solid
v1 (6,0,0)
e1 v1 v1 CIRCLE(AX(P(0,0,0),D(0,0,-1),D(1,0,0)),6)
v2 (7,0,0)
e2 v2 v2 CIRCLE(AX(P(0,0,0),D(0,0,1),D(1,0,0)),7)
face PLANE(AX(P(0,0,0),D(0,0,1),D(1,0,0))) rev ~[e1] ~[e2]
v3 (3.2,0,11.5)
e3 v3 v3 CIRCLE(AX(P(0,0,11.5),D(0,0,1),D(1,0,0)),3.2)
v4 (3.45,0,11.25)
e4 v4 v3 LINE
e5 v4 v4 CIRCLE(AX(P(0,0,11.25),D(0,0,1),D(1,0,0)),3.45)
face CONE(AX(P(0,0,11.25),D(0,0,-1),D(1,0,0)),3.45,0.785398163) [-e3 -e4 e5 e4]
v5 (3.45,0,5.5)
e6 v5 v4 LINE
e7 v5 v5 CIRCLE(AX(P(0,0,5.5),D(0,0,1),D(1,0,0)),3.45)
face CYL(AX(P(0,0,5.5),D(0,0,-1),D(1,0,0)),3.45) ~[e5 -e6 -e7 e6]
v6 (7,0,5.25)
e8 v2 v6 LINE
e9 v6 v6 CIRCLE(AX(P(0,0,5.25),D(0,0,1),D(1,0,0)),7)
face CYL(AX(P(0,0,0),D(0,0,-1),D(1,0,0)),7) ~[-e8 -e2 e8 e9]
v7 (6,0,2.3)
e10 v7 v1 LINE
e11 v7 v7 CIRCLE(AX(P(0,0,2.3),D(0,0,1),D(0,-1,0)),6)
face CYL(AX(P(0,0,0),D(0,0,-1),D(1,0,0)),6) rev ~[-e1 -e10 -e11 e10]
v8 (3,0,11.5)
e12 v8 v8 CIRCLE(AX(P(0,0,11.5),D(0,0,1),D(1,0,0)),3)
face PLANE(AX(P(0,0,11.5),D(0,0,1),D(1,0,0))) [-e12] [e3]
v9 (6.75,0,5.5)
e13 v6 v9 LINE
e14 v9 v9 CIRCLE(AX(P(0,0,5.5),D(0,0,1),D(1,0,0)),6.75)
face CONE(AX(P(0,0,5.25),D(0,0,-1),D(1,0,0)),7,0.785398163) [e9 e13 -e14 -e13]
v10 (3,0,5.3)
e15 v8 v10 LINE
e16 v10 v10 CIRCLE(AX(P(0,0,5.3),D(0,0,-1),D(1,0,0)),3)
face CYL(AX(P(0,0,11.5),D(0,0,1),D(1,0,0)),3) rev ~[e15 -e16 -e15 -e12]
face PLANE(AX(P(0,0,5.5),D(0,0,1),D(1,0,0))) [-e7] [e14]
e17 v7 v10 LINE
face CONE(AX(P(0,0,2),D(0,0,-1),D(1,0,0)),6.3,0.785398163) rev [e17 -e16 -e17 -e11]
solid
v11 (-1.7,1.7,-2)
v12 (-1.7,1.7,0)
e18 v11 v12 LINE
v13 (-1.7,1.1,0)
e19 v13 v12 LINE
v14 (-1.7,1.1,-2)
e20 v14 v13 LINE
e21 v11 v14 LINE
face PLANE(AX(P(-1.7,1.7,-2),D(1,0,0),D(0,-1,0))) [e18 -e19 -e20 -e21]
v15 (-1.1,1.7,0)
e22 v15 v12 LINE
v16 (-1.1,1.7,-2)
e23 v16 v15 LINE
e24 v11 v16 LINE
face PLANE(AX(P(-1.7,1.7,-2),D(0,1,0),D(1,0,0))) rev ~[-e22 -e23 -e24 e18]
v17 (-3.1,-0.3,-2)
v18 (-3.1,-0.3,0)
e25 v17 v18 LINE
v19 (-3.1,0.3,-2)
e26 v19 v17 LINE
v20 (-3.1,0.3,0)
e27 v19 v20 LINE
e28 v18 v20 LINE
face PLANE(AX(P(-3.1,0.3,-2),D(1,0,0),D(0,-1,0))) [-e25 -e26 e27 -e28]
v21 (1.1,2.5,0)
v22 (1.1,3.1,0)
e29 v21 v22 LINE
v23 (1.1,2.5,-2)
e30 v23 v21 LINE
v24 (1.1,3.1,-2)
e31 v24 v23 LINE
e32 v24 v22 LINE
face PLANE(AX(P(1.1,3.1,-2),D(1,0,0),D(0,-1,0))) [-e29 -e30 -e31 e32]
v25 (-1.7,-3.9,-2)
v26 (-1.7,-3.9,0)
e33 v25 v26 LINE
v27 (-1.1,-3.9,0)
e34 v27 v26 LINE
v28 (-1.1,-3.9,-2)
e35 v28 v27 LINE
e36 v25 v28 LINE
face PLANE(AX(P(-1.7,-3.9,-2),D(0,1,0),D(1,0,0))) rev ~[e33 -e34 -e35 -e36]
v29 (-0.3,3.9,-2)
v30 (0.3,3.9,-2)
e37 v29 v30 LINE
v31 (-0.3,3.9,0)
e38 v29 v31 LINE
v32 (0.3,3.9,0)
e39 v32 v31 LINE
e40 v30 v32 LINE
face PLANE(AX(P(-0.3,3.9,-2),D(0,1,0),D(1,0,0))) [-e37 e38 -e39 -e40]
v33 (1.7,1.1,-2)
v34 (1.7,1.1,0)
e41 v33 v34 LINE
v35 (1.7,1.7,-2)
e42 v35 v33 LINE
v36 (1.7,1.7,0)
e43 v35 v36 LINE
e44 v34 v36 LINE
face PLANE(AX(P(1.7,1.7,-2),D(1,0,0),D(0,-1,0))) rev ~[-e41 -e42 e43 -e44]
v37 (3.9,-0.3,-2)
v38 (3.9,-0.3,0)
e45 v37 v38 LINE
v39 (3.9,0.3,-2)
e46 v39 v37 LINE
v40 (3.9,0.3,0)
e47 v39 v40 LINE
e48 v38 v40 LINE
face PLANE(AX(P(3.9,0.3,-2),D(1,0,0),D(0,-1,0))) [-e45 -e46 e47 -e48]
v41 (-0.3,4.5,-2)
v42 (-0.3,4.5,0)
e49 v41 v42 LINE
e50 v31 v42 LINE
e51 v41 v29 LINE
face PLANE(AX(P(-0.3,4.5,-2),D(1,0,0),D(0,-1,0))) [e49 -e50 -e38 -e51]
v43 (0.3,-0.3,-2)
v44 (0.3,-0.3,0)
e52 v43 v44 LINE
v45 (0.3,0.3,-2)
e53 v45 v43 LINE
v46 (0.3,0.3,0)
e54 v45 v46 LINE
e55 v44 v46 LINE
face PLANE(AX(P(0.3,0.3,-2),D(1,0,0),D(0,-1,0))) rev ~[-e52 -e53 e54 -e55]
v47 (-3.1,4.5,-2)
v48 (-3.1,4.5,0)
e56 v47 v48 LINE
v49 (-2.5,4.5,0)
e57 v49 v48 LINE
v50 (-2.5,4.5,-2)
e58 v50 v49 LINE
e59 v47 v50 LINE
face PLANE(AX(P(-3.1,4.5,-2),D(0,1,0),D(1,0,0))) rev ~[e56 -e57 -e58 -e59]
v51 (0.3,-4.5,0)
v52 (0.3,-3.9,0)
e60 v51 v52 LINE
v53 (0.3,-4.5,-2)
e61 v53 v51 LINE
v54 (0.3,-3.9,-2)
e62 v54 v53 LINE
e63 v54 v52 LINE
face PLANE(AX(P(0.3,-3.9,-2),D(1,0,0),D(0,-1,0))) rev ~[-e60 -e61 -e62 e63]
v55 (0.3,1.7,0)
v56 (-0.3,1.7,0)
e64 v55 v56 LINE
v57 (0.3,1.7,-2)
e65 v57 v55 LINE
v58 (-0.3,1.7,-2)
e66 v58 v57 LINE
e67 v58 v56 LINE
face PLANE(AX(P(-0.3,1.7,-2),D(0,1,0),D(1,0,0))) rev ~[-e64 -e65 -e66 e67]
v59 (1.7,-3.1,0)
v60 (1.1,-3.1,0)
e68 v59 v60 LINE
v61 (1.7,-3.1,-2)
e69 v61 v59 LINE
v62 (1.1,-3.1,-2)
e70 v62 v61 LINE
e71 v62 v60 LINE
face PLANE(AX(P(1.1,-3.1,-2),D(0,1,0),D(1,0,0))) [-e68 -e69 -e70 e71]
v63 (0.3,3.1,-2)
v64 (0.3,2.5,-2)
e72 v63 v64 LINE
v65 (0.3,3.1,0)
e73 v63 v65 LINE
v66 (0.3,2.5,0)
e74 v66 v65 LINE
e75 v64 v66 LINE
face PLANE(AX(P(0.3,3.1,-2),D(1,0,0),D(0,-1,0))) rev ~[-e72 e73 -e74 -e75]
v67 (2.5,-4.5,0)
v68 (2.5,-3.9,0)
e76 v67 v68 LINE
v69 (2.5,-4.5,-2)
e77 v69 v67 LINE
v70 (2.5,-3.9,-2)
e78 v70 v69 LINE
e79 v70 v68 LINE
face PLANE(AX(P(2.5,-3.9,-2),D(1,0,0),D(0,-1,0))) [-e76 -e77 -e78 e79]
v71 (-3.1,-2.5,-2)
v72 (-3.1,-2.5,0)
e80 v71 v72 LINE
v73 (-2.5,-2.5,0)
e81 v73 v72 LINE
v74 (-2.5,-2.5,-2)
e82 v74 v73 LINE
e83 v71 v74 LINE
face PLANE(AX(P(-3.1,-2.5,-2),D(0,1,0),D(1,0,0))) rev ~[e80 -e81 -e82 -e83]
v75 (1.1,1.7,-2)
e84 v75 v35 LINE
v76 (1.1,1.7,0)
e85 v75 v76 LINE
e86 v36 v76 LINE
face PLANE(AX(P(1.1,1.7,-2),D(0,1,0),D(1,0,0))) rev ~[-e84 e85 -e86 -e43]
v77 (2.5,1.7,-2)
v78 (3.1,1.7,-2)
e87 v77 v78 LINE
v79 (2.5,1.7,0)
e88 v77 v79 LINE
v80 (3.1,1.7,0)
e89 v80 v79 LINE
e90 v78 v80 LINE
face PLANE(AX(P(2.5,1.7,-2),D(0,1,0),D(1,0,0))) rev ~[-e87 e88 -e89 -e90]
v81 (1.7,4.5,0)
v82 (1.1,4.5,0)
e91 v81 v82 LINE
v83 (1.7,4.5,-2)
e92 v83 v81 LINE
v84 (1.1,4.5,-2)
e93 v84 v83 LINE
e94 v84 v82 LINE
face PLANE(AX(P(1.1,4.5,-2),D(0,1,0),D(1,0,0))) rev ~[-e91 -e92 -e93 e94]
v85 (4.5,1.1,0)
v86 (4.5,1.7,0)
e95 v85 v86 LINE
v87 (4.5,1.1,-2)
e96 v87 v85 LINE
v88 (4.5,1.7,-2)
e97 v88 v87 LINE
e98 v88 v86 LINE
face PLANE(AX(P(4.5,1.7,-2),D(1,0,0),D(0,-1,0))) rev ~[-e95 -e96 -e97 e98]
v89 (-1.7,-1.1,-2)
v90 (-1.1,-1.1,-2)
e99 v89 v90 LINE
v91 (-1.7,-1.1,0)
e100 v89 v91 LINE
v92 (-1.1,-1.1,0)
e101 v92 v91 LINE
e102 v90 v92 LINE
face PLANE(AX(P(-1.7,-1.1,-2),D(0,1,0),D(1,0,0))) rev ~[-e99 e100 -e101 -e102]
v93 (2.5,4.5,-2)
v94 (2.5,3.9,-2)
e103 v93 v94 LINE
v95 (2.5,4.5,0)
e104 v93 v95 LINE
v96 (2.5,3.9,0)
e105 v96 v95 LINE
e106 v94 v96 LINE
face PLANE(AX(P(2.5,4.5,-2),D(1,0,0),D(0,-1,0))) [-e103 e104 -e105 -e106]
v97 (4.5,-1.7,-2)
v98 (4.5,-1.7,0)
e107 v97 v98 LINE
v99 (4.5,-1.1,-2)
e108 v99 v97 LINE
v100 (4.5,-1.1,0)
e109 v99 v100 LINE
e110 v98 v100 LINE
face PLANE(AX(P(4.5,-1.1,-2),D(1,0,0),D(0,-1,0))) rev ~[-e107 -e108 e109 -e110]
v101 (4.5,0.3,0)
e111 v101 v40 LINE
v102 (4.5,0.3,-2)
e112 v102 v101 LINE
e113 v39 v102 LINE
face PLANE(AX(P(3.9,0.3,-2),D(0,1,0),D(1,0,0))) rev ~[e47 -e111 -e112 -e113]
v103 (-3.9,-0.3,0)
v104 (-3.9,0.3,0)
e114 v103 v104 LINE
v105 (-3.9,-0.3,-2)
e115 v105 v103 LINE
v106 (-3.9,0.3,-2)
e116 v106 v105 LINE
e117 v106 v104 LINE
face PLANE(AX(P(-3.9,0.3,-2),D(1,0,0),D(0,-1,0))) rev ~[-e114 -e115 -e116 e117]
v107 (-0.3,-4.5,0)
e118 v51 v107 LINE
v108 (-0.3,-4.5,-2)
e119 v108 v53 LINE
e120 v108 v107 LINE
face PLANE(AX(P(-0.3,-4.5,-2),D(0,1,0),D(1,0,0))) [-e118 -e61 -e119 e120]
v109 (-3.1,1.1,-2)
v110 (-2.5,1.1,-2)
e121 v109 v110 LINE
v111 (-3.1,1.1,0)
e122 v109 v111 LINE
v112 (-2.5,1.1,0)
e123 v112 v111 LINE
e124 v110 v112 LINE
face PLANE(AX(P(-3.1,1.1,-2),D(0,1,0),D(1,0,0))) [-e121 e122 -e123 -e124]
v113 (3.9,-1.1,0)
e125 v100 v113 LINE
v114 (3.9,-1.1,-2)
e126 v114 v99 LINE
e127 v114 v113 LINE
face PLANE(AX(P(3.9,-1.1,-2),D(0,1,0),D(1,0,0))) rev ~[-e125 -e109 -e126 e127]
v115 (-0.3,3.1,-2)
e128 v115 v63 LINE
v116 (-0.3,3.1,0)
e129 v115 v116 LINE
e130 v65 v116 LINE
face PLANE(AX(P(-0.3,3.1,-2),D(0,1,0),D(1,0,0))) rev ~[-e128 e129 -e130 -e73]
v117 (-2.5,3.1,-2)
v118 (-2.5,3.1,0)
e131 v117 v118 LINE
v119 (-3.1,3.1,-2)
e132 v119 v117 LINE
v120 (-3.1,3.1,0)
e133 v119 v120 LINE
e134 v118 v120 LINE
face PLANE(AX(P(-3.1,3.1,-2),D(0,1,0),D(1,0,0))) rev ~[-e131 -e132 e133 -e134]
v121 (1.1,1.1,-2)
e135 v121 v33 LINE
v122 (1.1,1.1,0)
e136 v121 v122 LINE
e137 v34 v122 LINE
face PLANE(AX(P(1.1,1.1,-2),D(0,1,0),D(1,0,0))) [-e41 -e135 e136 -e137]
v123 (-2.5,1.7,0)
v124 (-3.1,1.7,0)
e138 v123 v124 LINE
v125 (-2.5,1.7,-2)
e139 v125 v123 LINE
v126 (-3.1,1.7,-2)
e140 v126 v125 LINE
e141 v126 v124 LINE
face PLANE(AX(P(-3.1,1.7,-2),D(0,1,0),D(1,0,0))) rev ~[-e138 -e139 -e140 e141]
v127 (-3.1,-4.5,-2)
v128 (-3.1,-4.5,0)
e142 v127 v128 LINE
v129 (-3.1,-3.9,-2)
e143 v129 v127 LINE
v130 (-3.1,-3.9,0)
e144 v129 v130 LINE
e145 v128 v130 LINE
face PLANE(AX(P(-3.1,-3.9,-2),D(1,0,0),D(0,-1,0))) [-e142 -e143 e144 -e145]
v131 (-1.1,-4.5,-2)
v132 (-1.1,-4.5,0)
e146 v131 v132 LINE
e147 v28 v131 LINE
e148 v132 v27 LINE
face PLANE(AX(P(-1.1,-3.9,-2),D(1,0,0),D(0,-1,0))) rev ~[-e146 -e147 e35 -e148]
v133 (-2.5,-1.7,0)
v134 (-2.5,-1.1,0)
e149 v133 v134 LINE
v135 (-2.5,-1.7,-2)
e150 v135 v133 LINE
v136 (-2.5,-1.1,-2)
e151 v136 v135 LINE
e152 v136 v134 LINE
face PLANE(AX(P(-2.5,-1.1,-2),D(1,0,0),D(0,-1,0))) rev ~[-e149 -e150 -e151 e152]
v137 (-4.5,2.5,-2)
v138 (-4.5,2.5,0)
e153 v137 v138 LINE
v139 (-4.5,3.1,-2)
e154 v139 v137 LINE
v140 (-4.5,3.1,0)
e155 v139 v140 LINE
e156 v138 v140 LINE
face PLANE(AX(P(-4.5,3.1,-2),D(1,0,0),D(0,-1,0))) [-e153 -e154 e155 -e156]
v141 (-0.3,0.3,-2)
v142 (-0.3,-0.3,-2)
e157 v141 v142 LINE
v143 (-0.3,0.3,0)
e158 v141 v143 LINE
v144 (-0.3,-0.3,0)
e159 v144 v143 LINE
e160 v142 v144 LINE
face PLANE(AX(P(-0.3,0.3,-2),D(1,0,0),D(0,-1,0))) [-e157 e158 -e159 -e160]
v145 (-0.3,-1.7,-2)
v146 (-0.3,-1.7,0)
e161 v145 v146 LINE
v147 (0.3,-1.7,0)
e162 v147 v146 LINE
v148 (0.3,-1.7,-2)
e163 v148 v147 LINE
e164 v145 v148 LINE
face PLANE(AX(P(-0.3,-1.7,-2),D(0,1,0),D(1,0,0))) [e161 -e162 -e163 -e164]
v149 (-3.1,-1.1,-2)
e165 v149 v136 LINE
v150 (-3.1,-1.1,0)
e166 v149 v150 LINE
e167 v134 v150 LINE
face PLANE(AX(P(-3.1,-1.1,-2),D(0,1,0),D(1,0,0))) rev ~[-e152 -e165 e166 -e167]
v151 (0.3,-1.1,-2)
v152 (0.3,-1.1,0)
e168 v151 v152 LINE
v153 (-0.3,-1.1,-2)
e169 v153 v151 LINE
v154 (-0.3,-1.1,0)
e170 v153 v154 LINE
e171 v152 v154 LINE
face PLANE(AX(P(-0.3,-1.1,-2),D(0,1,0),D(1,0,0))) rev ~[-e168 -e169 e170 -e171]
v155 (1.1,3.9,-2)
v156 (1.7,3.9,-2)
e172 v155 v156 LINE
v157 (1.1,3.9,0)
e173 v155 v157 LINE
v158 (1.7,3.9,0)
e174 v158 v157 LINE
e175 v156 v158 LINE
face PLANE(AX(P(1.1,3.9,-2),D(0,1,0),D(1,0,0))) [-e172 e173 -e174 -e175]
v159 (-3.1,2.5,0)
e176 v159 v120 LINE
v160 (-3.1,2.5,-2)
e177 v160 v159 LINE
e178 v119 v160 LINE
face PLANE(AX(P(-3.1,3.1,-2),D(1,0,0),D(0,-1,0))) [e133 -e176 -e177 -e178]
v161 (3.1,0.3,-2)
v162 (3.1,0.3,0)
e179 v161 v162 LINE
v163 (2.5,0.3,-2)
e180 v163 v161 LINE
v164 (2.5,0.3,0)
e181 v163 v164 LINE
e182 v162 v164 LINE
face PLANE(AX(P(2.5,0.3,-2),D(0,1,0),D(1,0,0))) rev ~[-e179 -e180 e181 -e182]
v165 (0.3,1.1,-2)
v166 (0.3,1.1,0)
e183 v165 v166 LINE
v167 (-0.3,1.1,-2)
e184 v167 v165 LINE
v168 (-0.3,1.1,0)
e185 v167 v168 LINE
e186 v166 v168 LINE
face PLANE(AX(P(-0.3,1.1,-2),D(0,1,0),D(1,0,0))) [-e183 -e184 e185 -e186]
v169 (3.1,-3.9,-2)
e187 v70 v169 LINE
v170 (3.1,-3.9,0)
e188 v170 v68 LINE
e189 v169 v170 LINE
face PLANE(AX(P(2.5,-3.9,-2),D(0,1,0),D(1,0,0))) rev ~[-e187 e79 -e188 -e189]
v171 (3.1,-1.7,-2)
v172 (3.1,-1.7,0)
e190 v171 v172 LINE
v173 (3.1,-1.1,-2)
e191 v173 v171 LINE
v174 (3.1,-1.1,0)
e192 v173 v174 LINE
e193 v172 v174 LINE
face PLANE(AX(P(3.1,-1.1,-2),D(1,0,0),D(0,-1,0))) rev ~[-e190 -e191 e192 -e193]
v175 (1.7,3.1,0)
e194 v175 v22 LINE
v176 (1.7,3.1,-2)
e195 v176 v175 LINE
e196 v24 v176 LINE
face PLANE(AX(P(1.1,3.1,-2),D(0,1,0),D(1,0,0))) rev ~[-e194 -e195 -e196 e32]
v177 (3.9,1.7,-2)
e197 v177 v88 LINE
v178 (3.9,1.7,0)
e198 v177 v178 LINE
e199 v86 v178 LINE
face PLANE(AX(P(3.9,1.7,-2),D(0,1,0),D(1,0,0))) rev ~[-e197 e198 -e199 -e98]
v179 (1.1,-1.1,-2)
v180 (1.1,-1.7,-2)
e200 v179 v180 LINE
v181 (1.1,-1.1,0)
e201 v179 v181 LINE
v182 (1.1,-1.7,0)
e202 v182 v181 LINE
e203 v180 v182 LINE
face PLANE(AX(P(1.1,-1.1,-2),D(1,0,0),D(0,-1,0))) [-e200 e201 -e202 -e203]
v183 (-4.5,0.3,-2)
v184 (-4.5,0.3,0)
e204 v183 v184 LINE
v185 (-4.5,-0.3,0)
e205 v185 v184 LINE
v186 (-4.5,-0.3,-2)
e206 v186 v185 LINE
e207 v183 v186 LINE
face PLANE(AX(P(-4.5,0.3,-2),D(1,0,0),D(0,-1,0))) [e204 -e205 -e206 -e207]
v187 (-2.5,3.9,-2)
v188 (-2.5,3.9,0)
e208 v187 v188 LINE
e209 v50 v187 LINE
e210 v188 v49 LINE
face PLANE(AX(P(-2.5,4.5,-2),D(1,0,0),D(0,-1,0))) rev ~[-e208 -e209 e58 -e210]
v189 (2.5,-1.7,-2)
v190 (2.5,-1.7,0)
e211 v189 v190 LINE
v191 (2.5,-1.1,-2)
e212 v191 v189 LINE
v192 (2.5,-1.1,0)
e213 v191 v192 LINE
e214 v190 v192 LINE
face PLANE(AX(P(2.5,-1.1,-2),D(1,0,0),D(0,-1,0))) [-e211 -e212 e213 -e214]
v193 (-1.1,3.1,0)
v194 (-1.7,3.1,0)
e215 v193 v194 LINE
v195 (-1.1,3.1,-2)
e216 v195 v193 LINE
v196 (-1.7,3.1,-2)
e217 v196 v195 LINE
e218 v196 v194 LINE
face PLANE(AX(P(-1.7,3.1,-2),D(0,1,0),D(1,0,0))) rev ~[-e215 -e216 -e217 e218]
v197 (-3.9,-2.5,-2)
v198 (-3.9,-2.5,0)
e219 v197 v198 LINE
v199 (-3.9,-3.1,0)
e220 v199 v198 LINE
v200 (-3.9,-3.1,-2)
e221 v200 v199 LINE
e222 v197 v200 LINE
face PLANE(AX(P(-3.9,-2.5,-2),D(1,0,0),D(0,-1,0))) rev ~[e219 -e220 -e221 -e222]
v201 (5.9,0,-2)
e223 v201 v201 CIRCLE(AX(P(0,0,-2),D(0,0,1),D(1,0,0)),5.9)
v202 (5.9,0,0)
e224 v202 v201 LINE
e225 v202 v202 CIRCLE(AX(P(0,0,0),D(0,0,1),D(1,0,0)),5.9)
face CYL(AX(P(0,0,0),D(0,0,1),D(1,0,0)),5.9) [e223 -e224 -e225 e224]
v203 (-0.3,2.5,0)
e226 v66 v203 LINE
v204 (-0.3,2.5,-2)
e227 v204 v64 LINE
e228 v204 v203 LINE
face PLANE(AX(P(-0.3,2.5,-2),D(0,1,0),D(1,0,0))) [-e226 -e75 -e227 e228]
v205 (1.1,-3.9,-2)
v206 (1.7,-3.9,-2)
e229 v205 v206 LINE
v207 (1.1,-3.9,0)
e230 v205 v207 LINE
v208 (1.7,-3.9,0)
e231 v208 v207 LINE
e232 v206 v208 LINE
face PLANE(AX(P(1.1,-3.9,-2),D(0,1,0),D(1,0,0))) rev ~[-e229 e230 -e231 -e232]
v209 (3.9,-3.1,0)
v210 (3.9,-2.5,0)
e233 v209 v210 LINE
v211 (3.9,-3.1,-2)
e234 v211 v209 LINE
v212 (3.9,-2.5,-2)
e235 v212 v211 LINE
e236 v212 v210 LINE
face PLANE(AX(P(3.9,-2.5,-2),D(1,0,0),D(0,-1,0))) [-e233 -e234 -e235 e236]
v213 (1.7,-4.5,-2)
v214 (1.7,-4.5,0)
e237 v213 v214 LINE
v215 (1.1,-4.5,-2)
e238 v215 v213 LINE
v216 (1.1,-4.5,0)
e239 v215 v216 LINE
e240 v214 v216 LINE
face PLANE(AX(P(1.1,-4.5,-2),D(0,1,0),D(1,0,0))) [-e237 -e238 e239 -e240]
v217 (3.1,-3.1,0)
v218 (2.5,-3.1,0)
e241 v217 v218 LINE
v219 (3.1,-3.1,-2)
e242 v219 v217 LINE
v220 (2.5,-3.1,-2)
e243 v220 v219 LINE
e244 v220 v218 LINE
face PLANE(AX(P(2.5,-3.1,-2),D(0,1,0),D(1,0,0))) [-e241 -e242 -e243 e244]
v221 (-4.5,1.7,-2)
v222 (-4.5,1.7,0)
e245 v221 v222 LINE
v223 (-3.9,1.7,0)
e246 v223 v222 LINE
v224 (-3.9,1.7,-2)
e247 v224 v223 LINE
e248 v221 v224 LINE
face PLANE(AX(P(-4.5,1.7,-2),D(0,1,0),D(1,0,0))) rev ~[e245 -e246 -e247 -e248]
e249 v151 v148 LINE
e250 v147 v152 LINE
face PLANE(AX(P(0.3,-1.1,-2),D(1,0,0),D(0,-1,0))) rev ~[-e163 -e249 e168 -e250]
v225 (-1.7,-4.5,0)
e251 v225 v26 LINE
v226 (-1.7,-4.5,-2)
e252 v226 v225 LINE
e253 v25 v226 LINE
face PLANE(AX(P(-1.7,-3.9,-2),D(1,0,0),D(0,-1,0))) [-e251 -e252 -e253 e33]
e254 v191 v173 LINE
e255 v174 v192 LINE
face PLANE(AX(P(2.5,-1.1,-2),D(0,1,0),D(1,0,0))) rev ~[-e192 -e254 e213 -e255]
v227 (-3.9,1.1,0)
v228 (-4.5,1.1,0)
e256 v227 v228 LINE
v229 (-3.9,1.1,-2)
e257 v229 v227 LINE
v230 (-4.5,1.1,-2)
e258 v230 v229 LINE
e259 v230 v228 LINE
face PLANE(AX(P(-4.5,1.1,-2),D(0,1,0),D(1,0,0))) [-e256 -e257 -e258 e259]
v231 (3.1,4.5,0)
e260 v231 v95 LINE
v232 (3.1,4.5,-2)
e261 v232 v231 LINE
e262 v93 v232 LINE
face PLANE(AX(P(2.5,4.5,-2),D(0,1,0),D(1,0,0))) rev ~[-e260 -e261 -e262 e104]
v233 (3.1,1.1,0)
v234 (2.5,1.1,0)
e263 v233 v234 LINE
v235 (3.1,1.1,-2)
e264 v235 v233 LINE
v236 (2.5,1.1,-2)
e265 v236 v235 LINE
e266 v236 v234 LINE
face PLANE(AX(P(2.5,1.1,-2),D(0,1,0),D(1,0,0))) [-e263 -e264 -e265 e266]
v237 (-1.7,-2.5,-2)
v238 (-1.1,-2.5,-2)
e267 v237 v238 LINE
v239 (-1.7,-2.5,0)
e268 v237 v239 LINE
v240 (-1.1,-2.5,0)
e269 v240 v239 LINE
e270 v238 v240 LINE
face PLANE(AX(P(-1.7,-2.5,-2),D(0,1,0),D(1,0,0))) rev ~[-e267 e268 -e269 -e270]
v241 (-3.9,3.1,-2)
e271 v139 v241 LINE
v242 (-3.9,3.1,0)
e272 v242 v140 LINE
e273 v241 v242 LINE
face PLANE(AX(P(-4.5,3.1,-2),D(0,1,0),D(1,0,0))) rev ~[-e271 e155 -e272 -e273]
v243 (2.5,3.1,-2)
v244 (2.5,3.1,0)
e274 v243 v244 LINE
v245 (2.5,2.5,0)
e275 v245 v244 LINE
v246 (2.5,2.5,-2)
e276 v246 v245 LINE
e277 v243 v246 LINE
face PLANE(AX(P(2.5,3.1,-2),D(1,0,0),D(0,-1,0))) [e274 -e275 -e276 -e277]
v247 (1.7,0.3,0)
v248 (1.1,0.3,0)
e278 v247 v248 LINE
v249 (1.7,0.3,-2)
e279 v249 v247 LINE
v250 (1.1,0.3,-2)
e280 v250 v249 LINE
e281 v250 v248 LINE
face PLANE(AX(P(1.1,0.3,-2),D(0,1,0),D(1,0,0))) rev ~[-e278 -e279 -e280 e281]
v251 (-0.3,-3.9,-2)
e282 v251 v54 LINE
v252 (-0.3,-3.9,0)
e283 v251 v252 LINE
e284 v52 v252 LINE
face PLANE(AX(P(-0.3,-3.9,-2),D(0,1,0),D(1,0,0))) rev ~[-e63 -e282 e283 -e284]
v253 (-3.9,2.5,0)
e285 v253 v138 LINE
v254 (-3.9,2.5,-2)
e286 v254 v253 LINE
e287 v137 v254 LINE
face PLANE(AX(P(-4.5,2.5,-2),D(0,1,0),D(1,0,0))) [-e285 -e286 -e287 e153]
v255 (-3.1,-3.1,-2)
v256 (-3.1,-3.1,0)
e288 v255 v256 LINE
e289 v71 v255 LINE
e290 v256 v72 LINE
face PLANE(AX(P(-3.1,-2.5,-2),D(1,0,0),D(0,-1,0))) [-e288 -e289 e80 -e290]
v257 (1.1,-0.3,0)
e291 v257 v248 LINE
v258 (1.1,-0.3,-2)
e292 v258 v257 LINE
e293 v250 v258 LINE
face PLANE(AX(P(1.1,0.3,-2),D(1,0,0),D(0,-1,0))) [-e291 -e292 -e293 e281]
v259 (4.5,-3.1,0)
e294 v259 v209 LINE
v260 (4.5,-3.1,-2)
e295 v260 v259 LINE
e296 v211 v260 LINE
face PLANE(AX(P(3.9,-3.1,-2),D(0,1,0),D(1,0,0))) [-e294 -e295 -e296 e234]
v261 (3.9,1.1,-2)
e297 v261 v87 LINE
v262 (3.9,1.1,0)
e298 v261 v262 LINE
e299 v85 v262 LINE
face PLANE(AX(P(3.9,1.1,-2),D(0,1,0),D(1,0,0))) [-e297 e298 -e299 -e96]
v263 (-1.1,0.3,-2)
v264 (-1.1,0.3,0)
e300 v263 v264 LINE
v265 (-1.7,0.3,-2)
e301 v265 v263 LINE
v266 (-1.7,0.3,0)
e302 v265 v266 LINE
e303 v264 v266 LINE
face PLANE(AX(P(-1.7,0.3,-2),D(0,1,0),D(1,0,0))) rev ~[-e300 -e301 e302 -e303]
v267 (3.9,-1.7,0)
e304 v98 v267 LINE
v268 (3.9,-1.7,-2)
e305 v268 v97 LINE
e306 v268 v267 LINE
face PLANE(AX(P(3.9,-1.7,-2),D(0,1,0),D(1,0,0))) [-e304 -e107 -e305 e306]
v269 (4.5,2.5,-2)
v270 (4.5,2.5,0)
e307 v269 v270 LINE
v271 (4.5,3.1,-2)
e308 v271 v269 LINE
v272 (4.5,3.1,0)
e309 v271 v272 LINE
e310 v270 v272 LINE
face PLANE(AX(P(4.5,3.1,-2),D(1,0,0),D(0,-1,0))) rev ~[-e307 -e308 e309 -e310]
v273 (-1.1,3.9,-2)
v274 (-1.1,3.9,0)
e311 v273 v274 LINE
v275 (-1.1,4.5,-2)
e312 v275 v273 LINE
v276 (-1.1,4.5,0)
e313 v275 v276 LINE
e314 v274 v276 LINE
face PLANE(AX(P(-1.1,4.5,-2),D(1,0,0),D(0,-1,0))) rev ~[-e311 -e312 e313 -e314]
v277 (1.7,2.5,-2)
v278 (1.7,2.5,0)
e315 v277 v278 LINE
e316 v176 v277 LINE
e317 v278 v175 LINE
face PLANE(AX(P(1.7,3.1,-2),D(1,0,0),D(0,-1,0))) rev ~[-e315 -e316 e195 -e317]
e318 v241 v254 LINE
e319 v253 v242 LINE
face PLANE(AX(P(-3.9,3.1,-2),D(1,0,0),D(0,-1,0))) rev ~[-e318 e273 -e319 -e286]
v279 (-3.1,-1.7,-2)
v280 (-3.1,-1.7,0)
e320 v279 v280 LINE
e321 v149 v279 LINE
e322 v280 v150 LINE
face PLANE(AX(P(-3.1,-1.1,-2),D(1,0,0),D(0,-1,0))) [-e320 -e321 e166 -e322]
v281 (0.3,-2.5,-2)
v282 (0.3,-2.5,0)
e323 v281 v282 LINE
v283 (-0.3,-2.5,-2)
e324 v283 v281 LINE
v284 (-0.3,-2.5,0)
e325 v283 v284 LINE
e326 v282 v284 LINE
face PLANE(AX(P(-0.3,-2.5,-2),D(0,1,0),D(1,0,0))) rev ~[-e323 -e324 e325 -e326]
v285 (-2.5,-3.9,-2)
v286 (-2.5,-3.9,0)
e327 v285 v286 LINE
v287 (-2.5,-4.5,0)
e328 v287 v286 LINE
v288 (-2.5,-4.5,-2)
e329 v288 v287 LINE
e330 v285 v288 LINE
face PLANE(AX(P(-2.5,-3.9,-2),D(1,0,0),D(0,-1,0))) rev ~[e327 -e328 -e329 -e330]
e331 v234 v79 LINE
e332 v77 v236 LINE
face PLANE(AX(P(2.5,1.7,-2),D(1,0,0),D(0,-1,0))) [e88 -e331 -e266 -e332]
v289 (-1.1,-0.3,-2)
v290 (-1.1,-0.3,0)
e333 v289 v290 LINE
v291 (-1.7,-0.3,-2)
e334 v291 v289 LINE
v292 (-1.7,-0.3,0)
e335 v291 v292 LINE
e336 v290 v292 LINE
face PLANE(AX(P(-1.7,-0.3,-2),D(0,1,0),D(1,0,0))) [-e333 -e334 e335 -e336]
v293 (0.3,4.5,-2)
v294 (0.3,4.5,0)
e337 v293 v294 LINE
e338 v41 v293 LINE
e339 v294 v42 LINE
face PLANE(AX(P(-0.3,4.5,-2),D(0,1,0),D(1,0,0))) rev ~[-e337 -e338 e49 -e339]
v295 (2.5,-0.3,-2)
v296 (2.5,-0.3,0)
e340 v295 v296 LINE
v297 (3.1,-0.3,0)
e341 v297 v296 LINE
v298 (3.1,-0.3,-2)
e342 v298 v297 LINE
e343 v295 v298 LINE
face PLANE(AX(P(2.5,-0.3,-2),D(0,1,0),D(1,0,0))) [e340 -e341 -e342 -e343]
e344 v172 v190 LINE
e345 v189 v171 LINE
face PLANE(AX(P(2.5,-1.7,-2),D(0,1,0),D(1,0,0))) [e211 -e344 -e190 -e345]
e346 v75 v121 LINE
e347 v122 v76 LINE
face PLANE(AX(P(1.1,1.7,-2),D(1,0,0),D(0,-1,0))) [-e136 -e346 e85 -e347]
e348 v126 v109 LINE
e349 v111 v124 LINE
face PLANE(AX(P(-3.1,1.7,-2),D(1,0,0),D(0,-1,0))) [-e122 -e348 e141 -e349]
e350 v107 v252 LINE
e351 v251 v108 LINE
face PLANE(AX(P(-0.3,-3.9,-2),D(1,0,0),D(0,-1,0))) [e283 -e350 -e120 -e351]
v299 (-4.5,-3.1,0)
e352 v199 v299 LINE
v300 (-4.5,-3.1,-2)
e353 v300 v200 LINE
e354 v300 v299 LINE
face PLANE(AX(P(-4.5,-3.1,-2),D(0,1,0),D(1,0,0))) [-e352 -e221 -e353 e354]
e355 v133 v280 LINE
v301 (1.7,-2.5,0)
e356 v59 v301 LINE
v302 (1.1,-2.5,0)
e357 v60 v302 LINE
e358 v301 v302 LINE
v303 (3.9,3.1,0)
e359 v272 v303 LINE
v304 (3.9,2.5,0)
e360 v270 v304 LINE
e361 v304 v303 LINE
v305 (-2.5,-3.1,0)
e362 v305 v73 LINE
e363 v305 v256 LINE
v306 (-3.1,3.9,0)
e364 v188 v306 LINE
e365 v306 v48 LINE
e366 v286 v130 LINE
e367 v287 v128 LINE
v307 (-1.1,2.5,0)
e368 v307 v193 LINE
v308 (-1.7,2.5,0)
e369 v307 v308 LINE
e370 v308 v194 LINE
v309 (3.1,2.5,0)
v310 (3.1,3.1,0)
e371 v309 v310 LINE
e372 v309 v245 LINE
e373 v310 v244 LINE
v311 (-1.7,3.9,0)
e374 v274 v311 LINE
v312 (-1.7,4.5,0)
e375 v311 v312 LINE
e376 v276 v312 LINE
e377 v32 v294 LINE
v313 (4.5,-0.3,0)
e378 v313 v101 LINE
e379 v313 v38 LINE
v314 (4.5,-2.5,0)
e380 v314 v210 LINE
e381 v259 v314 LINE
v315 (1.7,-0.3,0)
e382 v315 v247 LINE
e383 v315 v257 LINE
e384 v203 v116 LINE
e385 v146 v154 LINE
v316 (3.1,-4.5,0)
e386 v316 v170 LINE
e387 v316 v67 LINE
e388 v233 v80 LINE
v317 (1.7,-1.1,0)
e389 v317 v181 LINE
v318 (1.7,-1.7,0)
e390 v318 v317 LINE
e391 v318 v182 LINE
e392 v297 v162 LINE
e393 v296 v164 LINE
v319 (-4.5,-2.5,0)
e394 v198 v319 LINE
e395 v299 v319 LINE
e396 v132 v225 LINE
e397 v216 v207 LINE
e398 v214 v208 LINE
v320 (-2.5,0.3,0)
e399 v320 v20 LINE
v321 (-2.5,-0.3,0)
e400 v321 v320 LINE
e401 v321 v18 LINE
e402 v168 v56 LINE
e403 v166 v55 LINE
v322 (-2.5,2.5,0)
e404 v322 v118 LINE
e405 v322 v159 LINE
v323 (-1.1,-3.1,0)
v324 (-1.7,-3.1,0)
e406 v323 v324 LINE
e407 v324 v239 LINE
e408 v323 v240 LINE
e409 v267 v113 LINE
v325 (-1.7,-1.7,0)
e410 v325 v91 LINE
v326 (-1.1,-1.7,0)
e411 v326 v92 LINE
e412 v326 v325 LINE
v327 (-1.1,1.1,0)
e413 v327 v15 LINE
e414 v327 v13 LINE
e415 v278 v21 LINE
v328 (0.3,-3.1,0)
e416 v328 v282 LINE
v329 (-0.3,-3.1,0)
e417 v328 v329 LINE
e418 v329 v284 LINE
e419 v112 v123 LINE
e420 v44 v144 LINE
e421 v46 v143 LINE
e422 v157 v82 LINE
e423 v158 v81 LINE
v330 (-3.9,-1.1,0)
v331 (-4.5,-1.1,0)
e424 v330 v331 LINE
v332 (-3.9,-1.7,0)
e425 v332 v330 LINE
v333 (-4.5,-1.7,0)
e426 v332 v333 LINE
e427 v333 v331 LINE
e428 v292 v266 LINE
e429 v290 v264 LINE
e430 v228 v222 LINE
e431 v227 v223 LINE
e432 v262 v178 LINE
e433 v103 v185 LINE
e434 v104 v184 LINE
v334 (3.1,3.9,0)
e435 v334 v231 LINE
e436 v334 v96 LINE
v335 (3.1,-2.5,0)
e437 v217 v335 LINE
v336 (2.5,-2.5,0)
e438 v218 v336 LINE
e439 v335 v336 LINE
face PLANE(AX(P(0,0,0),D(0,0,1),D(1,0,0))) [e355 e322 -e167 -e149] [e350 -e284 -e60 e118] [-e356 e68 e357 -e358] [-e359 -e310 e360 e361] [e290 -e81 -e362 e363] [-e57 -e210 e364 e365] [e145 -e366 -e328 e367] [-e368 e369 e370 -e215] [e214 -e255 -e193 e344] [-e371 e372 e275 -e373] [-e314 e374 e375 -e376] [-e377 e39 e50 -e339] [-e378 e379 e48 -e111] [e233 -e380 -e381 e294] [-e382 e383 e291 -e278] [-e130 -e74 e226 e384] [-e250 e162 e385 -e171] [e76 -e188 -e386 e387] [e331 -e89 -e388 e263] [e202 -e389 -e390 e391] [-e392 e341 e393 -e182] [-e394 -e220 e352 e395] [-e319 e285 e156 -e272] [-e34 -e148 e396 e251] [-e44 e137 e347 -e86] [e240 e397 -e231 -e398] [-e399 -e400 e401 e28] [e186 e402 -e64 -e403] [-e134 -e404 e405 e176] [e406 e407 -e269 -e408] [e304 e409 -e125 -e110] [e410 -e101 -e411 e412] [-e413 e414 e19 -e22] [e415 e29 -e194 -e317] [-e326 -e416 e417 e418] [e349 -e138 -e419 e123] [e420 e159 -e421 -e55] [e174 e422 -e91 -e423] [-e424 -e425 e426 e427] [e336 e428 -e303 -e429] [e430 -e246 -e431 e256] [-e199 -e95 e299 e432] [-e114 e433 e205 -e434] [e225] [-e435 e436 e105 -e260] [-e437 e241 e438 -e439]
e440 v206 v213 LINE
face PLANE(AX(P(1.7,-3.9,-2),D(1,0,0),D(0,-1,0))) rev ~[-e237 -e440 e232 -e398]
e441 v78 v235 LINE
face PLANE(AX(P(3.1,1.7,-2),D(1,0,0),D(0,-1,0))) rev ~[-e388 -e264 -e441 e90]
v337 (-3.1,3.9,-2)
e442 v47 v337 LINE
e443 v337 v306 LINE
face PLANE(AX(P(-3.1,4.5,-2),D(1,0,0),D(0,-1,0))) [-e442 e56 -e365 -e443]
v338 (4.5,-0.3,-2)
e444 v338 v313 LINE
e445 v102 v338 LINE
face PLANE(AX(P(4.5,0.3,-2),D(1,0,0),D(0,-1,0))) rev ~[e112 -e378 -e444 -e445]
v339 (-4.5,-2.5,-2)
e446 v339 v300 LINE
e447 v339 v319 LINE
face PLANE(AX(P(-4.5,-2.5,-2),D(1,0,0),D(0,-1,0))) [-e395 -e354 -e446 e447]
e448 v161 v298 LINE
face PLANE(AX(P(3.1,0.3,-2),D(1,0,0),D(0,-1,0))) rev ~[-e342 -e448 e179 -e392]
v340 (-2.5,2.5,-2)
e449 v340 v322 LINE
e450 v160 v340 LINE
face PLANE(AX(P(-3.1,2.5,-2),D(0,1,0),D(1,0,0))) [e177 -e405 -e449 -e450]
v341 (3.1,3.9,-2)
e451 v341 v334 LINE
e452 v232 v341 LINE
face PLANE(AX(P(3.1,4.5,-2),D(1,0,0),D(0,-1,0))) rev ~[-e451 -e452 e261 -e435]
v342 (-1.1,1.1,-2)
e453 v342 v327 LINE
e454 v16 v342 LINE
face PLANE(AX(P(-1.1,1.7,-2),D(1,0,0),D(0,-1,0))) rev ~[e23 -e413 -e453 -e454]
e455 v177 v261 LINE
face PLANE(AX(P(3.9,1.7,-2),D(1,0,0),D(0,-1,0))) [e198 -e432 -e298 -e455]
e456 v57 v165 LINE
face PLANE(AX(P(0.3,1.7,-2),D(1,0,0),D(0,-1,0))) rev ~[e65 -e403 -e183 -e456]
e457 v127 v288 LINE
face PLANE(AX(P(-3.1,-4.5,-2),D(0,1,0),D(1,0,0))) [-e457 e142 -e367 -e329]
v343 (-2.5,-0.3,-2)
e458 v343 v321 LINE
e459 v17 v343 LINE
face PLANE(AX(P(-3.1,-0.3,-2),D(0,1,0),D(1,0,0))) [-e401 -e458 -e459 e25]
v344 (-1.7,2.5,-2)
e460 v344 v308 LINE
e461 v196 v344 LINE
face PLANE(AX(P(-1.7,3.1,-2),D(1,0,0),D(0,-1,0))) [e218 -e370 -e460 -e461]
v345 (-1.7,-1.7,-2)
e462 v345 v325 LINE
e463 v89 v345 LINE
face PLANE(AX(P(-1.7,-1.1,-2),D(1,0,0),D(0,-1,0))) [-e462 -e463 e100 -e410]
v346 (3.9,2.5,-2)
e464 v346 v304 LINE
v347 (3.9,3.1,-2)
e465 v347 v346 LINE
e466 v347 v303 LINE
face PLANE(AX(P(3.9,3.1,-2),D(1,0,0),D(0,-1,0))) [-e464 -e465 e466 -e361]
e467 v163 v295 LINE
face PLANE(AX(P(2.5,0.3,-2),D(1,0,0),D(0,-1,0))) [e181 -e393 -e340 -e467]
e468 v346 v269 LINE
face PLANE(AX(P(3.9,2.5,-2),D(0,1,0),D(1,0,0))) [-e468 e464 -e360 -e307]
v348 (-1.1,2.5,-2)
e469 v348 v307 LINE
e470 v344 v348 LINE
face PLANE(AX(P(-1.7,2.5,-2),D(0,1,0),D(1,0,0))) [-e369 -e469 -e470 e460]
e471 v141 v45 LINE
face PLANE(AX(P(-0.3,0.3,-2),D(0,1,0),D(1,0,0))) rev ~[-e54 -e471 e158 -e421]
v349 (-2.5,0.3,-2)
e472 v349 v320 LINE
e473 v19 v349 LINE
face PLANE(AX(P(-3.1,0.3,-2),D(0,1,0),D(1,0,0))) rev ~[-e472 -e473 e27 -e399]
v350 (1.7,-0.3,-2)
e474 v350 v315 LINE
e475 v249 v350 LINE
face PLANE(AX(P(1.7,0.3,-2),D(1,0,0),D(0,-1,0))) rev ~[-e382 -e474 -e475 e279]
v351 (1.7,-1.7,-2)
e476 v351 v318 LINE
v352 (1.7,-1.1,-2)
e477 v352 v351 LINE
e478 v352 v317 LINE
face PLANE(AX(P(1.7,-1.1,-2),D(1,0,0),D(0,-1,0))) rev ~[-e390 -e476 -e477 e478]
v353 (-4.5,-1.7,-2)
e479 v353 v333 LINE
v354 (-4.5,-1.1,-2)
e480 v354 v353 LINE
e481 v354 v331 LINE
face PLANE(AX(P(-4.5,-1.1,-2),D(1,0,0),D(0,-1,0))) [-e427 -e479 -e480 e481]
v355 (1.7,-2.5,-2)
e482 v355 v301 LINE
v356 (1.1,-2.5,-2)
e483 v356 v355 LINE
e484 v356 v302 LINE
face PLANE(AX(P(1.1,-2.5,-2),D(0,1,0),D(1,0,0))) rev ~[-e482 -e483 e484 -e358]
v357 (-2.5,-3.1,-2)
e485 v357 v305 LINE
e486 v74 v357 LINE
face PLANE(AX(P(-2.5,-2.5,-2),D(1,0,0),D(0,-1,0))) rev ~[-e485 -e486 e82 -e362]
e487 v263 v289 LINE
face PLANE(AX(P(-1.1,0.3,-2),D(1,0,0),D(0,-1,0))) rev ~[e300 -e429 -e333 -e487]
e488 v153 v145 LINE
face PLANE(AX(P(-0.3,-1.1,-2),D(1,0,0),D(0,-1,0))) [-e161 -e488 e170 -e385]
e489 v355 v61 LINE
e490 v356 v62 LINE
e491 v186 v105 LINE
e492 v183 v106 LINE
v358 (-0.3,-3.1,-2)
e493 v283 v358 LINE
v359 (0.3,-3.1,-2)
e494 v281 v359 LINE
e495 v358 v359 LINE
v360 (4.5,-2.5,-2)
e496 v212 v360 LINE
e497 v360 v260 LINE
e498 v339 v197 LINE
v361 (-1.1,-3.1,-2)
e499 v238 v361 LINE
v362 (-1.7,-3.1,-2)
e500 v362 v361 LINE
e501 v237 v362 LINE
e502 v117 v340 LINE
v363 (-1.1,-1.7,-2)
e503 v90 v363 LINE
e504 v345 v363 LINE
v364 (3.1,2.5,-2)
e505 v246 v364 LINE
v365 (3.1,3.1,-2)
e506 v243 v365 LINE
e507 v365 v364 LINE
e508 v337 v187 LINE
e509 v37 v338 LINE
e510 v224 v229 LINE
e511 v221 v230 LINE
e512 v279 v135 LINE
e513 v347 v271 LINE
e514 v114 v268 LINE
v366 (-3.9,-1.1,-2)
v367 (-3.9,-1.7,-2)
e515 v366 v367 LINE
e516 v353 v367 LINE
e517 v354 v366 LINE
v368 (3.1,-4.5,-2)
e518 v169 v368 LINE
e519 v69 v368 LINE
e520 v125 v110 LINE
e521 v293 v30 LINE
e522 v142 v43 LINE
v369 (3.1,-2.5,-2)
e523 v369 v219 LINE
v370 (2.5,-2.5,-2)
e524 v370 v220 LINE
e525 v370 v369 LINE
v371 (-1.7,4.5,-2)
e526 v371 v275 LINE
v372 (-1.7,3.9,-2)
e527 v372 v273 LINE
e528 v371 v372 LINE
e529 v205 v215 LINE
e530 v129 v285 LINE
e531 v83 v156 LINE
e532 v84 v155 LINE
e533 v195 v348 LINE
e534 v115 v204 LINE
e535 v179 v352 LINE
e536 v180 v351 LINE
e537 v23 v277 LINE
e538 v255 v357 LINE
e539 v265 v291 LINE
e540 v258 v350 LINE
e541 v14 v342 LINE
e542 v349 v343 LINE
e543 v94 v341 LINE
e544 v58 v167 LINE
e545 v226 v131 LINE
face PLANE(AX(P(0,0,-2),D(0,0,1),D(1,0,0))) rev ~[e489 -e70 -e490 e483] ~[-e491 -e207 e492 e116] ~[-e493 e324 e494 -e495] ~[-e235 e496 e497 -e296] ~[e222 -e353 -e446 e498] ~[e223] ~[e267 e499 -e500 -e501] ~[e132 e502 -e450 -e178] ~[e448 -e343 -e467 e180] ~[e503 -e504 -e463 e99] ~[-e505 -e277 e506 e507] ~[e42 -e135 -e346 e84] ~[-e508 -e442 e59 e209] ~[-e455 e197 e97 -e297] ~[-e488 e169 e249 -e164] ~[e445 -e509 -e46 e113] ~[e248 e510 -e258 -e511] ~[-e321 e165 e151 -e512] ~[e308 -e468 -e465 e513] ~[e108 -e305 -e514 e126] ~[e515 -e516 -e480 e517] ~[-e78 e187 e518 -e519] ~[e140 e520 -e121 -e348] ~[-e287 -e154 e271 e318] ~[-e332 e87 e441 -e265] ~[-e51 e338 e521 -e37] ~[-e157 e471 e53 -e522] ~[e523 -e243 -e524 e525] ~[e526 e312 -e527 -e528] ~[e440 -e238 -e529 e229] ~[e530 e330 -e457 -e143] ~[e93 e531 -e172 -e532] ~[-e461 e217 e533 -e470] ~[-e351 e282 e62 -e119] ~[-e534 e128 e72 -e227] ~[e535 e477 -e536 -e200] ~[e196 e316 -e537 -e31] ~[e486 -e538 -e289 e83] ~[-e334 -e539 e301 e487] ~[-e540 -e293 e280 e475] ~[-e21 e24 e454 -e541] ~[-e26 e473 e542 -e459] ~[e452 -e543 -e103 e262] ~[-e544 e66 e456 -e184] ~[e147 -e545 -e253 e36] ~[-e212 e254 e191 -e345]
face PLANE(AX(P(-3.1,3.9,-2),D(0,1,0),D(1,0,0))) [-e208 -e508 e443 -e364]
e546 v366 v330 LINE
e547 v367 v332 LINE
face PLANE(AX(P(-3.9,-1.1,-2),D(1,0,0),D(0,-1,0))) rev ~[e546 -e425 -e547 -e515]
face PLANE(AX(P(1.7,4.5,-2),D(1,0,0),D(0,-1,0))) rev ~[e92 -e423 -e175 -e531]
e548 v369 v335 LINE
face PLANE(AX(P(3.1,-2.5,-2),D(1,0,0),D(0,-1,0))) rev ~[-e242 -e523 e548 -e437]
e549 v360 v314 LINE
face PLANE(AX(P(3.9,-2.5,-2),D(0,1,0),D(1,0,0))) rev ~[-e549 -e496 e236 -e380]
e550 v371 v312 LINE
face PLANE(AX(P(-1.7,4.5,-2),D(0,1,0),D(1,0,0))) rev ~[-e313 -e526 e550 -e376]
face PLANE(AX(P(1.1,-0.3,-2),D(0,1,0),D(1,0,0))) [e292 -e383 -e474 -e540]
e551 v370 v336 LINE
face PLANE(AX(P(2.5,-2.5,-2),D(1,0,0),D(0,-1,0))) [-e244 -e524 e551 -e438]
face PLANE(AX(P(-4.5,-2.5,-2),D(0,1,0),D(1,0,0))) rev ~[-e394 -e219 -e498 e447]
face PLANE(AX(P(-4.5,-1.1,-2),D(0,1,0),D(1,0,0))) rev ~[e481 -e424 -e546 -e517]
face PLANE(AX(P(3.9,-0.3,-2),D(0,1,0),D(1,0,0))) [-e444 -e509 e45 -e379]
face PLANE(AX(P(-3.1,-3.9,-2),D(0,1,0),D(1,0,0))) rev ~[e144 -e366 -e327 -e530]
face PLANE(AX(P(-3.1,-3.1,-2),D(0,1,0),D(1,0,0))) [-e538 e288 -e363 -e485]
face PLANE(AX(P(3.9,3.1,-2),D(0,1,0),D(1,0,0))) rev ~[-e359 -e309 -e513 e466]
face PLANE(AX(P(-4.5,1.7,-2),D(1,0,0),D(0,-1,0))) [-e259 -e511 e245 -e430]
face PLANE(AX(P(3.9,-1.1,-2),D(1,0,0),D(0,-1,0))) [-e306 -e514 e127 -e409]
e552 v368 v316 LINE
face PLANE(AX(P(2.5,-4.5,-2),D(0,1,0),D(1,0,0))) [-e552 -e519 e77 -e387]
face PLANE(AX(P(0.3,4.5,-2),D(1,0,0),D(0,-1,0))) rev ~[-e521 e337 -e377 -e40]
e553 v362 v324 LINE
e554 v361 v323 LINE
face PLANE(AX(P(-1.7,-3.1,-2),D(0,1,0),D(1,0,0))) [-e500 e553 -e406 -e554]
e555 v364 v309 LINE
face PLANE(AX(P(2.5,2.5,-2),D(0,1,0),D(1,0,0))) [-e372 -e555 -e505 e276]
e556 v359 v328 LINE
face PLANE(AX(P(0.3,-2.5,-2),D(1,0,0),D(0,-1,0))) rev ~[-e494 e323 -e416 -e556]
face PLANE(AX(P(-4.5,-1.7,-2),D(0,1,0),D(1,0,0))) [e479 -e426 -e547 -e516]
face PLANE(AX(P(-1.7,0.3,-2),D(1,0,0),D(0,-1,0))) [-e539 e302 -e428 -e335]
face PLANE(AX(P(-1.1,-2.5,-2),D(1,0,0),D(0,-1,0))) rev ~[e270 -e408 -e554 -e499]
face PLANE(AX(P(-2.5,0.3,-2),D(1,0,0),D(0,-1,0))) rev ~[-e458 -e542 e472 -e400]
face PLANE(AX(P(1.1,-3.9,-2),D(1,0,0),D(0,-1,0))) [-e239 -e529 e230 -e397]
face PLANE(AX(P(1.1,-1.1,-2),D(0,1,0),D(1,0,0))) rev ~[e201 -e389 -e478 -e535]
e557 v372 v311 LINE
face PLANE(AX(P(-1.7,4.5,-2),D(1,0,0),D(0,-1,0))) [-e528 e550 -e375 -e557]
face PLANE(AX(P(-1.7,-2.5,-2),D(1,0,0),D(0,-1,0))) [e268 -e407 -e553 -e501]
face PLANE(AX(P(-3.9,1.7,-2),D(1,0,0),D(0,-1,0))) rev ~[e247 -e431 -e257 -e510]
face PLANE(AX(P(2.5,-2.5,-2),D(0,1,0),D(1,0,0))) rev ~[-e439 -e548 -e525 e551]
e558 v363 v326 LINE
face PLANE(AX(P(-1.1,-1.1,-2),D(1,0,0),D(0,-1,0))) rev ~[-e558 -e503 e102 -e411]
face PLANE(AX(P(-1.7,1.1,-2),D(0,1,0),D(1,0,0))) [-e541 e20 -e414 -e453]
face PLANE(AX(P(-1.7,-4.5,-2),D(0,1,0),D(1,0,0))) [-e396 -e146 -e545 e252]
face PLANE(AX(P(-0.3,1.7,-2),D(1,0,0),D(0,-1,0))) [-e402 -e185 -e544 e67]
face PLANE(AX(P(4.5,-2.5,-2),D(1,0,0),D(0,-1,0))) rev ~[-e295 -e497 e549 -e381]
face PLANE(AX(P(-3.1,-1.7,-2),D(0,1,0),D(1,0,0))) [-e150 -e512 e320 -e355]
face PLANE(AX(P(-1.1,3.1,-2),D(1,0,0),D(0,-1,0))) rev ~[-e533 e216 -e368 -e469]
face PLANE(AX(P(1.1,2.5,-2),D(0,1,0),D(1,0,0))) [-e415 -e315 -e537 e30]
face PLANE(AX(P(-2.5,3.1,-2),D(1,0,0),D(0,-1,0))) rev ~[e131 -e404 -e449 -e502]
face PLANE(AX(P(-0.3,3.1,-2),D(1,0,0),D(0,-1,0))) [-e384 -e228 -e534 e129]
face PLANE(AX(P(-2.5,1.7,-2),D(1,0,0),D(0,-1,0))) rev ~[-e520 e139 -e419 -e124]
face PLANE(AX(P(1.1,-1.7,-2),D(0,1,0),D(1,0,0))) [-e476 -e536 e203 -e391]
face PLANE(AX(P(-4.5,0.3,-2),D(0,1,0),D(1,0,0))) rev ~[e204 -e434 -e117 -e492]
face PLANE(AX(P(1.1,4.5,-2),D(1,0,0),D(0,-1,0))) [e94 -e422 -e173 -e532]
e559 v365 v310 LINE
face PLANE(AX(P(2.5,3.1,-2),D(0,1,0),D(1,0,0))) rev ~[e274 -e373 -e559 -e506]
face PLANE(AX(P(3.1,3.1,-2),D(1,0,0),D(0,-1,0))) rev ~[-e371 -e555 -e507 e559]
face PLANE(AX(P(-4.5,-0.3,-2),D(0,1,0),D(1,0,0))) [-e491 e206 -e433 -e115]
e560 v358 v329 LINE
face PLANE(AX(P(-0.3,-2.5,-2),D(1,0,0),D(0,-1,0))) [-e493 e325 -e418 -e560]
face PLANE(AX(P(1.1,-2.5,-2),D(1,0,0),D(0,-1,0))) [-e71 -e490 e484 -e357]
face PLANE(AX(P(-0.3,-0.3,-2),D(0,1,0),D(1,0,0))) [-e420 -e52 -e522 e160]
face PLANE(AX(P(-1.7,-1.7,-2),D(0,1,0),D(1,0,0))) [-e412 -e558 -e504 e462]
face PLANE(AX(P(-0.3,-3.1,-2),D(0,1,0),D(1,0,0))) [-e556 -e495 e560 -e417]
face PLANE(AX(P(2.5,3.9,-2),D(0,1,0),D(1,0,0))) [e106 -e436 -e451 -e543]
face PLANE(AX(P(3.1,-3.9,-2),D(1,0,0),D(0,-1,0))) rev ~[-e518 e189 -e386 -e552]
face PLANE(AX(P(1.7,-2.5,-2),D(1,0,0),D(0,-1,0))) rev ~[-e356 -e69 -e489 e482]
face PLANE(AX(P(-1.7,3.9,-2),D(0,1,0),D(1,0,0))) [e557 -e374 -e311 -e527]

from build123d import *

# Parameters (mm, degrees)
F0_R        = 7
F1_DEPTH    = 5.5
F2_R        = 3.45
F3_DEPTH    = 6
F4_R        = 3
F5_DEPTH    = 25
F6_R        = 6
F6_R_2      = 3
F7_DEPTH    = 2
F8_S5_R     = 6
F8_T6_DEPTH = 11
F9_SIZE     = 0.25
F10_R       = 5.9
F11_DEPTH   = 2
F12_W       = 0.6
F12_H       = 0.6
F13_DEPTH   = 25


# Not quite as in the source:
# - a fillet or chamfer that OpenCascade refuses, or shapes differently, is made with other operations: its cross-section is extruded or revolved along the edge and cut away or added


with BuildPart() as f1:
    # F0 (on Top) → F1 (new body)
    with BuildSketch(Plane.XY):
        Circle(F0_R)
    extrude(amount=F1_DEPTH)

    # F2 (on face) → F3 (join)
    with BuildSketch(Plane.XY.offset(5.5)):
        Circle(F2_R)
    extrude(amount=F3_DEPTH)

    # F4 (on face) → F5 (cut)
    with BuildSketch(Plane.XY.offset(11.5)):
        Circle(F4_R)
    extrude(amount=-F5_DEPTH, mode=Mode.SUBTRACT)

    # F6 (on face) → F7 (cut)
    with BuildSketch(Plane(origin=(0, 0, 0), x_dir=(1, 0, 0), z_dir=(0, 0, -1))):
        Circle(F6_R)
        Circle(F6_R_2, mode=Mode.SUBTRACT)
    extrude(amount=-F7_DEPTH, mode=Mode.SUBTRACT)

    # F8: chamfer of 3.3 on 1 edges, made by hand


with BuildPart() as f8_tool2:
    # F8_s3 → F8_t4 (revolve)
    with BuildSketch(Plane.XZ):
        Polygon((6.3, 2), (3, 5.3), (3, 2), align=None)
    revolve(axis=Axis((0, 0, 2), (0, 0, -1)))

    # F8_s5 → F8_t6 (intersect, symmetric)
    with BuildSketch(Plane.XY.offset(3.6)):
        Circle(F8_S5_R)
    extrude(amount=F8_T6_DEPTH, both=True, mode=Mode.INTERSECT)


with BuildPart() as f1_1:
    add(f1.part)

    # F8_t1: cut F8_tool2
    add(f8_tool2.part, mode=Mode.SUBTRACT)

    # F9
    f9_edges = [f1_1.edges().sort_by_distance(p)[0] for p in [
        (-3.45, 0, 11.5),
        (-7, 0, 5.5),
    ]]
    chamfer(f9_edges, length=F9_SIZE)


with BuildPart() as f11:
    # F10 (on Top) → F11 (new body)
    with BuildSketch(Plane.XY):
        Circle(F10_R)
    extrude(amount=-F11_DEPTH)

    # F12 (on face) → F13 (cut)
    with BuildSketch(Plane(origin=(0, 0, -2), x_dir=(1, 0, 0), z_dir=(0, 0, -1))):
        with Locations((-2.8, 1.4)):
            Rectangle(F12_W, F12_H)
        with Locations((-2.8, 2.8)):
            Rectangle(F12_W, F12_H)
        with Locations((-2.8, 4.2)):
            Rectangle(F12_W, F12_H)
        with Locations((-1.4, 4.2)):
            Rectangle(F12_W, F12_H)
        with Locations((0, 4.2)):
            Rectangle(F12_W, F12_H)
        with Locations((1.4, 4.2)):
            Rectangle(F12_W, F12_H)
        with Locations((-4.2, 2.8)):
            Rectangle(F12_W, F12_H)
        with Locations((-4.2, 1.4)):
            Rectangle(F12_W, F12_H)
        with Locations((-4.2, 0)):
            Rectangle(F12_W, F12_H)
        with Locations((-4.2, -1.4)):
            Rectangle(F12_W, F12_H)
        with Locations((-4.2, -2.8)):
            Rectangle(F12_W, F12_H)
        with Locations((-2.8, -2.8)):
            Rectangle(F12_W, F12_H)
        with Locations((-2.8, -1.4)):
            Rectangle(F12_W, F12_H)
        with Locations((-2.8, 0)):
            Rectangle(F12_W, F12_H)
        with Locations((-1.4, 1.4)):
            Rectangle(F12_W, F12_H)
        with Locations((-1.4, 2.8)):
            Rectangle(F12_W, F12_H)
        with Locations((0, 2.8)):
            Rectangle(F12_W, F12_H)
        with Locations((0, 1.4)):
            Rectangle(F12_W, F12_H)
        Rectangle(F12_W, F12_H)
        with Locations((-1.4, 0)):
            Rectangle(F12_W, F12_H)
        with Locations((-1.4, -1.4)):
            Rectangle(F12_W, F12_H)
        with Locations((-1.4, -2.8)):
            Rectangle(F12_W, F12_H)
        with Locations((-2.8, -4.2)):
            Rectangle(F12_W, F12_H)
        with Locations((-1.4, -4.2)):
            Rectangle(F12_W, F12_H)
        with Locations((0, -4.2)):
            Rectangle(F12_W, F12_H)
        with Locations((1.4, -4.2)):
            Rectangle(F12_W, F12_H)
        with Locations((2.8, -4.2)):
            Rectangle(F12_W, F12_H)
        with Locations((4.2, -2.8)):
            Rectangle(F12_W, F12_H)
        with Locations((2.8, -2.8)):
            Rectangle(F12_W, F12_H)
        with Locations((1.4, -2.8)):
            Rectangle(F12_W, F12_H)
        with Locations((1.4, -1.4)):
            Rectangle(F12_W, F12_H)
        with Locations((1.4, 0)):
            Rectangle(F12_W, F12_H)
        with Locations((1.4, 1.4)):
            Rectangle(F12_W, F12_H)
        with Locations((2.8, 4.2)):
            Rectangle(F12_W, F12_H)
        with Locations((4.2, 2.8)):
            Rectangle(F12_W, F12_H)
        with Locations((4.2, 1.4)):
            Rectangle(F12_W, F12_H)
        with Locations((4.2, 0)):
            Rectangle(F12_W, F12_H)
        with Locations((4.2, -1.4)):
            Rectangle(F12_W, F12_H)
        with Locations((2.8, -1.4)):
            Rectangle(F12_W, F12_H)
        with Locations((2.8, 0)):
            Rectangle(F12_W, F12_H)
        with Locations((2.8, 1.4)):
            Rectangle(F12_W, F12_H)
        with Locations((2.8, 2.8)):
            Rectangle(F12_W, F12_H)
        with Locations((0, -1.4)):
            Rectangle(F12_W, F12_H)
        with Locations((0, -2.8)):
            Rectangle(F12_W, F12_H)
        with Locations((1.4, 2.8)):
            Rectangle(F12_W, F12_H)
    extrude(amount=-F13_DEPTH, mode=Mode.SUBTRACT)


solid = Compound([f1_1.part, f11.part])
